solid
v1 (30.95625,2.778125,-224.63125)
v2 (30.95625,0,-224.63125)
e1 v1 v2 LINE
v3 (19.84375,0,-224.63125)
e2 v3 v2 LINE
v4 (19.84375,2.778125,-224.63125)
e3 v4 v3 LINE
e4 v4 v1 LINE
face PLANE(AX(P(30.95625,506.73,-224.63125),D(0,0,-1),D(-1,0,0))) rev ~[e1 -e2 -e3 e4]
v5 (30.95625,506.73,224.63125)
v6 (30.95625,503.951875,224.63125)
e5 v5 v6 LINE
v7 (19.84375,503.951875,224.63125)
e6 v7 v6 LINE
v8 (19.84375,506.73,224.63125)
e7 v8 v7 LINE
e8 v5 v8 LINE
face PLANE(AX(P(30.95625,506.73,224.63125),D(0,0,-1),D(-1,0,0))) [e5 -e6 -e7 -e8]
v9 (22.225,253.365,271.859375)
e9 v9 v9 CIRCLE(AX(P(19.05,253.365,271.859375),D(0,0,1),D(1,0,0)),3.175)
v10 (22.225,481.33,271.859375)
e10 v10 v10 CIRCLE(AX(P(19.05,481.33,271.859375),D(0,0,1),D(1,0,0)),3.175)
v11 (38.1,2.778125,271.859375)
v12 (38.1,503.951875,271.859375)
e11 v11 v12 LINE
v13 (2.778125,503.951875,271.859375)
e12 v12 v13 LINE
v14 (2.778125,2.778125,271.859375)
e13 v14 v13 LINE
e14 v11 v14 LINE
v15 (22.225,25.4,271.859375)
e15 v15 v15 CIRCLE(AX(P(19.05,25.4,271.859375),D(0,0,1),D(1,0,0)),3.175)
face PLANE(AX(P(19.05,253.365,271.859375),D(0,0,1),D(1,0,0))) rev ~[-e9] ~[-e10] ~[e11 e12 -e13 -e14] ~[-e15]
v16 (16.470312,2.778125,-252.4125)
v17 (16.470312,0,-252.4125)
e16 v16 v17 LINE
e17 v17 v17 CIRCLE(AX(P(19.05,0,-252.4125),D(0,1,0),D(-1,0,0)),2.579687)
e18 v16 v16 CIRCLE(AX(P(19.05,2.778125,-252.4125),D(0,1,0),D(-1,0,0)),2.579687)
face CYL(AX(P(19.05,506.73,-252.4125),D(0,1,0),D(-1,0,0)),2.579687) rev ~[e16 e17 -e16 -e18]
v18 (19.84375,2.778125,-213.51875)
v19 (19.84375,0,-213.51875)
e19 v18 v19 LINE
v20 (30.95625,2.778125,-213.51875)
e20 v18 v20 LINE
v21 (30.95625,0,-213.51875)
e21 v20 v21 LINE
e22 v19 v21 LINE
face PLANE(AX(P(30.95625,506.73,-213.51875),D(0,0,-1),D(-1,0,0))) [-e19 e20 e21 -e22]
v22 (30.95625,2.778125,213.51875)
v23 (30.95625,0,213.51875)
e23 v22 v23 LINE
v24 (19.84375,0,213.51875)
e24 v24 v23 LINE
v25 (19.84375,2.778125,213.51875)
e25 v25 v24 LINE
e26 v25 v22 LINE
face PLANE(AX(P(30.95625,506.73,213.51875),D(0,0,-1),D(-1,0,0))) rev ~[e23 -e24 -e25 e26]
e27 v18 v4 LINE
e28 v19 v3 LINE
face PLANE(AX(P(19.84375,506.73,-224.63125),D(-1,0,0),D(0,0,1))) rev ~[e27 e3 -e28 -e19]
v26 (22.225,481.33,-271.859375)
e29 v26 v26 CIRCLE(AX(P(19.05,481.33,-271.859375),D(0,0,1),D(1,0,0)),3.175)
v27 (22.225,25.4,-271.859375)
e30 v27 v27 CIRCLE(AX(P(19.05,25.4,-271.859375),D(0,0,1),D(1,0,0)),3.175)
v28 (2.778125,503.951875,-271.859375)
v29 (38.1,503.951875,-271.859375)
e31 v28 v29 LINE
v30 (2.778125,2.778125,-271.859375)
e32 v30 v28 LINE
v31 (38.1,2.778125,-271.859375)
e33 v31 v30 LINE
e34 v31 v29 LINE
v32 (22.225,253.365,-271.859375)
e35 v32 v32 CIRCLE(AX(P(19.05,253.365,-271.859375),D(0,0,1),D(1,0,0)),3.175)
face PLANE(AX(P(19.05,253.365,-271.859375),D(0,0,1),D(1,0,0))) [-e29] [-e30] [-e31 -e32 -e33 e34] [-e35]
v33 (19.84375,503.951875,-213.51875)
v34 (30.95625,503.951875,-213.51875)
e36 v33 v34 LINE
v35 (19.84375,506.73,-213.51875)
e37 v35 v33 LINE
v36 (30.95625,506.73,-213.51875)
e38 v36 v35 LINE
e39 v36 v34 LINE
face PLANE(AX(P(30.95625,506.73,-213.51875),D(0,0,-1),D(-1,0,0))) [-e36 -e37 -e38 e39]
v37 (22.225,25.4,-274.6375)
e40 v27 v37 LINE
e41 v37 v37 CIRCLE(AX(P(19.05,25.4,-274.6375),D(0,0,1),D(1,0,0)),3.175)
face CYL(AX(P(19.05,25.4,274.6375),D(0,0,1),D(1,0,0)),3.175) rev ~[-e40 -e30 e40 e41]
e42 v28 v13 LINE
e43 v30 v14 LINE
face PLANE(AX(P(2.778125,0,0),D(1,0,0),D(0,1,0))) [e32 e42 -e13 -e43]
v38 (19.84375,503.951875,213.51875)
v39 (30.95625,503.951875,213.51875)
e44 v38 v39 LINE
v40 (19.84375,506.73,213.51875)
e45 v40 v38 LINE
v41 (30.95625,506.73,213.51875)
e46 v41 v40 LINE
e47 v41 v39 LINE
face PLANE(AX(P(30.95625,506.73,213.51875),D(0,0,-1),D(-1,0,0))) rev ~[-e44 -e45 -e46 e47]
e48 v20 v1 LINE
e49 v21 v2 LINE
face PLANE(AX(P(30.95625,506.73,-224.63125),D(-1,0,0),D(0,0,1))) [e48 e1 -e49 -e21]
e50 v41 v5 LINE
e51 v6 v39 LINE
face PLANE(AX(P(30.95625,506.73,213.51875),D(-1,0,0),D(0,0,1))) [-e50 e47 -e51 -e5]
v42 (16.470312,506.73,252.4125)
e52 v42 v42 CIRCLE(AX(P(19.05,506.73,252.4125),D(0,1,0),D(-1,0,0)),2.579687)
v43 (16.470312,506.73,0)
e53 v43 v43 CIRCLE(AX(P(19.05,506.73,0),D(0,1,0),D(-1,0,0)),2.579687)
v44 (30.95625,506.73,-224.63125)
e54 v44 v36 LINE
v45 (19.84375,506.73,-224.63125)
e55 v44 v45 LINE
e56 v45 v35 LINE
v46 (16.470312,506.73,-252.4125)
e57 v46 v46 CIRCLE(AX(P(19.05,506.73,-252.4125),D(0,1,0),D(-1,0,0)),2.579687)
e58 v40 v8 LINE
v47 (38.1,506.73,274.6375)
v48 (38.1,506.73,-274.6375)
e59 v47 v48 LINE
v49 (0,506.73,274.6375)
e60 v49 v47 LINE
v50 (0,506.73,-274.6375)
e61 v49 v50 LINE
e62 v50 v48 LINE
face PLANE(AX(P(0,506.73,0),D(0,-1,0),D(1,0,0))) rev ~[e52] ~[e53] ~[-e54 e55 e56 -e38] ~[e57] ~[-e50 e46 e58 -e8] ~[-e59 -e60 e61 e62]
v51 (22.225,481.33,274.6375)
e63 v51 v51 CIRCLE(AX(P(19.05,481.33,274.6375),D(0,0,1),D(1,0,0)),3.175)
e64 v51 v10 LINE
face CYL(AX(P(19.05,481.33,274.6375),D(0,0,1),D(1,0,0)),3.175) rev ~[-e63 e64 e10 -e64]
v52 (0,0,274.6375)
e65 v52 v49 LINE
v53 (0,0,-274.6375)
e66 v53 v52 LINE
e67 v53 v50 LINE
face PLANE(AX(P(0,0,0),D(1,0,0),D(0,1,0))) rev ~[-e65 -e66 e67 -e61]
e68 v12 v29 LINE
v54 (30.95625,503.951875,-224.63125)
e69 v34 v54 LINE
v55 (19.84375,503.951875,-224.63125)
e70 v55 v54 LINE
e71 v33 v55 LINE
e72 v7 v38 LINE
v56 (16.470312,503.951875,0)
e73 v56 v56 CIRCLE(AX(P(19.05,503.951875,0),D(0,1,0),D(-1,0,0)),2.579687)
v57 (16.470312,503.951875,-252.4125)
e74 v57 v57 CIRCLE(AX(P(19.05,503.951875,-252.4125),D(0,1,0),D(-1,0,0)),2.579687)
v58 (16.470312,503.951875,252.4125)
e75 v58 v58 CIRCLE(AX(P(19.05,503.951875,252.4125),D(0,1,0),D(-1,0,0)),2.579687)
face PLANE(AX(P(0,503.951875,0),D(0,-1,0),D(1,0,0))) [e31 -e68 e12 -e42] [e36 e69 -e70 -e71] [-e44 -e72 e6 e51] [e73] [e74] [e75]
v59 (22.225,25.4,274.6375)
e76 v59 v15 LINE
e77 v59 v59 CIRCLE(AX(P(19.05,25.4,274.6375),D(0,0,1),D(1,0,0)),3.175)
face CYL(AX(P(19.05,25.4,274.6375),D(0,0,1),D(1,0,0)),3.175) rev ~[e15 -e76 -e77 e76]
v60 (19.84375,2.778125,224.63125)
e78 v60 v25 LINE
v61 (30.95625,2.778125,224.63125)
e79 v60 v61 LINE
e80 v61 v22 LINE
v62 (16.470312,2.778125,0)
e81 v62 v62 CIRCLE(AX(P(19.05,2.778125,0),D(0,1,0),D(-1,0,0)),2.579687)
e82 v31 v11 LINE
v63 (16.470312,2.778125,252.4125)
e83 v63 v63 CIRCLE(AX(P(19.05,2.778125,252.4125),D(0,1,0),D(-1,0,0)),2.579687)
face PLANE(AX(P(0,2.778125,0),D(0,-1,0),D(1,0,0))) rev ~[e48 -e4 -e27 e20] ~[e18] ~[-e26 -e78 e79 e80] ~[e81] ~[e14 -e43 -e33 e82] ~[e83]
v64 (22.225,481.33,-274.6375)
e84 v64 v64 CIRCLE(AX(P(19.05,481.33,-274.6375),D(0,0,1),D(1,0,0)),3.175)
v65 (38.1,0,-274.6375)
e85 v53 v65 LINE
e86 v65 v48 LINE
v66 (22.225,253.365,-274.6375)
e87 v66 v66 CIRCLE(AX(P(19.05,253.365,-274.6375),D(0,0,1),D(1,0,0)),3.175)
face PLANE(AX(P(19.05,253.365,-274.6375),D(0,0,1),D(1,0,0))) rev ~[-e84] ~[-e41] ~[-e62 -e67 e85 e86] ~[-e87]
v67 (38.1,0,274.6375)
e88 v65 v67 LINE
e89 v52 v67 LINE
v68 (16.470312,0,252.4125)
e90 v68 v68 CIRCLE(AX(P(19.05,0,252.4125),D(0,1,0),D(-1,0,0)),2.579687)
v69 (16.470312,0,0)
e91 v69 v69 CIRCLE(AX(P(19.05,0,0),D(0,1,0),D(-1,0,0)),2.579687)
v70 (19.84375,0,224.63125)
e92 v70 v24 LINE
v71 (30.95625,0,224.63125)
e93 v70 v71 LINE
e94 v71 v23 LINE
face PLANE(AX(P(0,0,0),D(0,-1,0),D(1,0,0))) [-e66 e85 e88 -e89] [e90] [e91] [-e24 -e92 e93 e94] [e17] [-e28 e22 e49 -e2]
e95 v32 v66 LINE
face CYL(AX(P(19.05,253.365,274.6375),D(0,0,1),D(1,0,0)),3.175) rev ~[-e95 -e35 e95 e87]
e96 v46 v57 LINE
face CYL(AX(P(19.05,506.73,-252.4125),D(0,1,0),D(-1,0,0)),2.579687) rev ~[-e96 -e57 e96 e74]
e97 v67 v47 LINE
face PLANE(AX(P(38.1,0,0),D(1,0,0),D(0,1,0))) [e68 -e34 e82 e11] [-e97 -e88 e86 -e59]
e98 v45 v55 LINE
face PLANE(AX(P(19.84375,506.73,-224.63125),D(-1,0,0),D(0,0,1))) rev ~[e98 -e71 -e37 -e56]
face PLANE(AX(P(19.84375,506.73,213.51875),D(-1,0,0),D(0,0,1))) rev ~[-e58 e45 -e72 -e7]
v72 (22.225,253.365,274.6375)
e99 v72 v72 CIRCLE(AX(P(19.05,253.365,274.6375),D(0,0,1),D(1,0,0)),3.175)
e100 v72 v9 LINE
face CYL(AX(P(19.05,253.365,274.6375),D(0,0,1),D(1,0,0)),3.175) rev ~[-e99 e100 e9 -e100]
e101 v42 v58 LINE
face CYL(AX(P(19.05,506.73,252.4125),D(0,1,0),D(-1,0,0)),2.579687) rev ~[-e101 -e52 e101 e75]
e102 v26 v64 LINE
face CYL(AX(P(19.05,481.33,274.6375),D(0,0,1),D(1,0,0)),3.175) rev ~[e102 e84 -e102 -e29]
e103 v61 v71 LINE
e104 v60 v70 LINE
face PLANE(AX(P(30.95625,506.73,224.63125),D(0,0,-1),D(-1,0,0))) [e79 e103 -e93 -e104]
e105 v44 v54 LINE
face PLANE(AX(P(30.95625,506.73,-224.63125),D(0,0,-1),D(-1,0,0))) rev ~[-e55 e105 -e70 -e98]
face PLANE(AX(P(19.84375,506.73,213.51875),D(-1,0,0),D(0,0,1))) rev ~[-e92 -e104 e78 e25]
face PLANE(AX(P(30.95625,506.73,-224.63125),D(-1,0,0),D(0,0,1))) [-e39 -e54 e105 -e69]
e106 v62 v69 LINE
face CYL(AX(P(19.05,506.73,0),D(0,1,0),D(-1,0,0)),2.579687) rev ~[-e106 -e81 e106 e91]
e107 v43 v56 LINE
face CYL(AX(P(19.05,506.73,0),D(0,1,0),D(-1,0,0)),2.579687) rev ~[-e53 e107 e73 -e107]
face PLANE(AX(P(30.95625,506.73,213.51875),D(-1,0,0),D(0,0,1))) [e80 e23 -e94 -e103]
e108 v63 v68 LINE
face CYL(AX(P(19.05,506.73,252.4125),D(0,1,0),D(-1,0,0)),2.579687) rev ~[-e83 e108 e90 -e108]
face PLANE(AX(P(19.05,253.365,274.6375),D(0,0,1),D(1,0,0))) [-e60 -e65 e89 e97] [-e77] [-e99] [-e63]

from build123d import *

# Parameters (mm, degrees)
F0_W     = 38.1
F0_H     = 506.73
F1_DEPTH = 274.6375
F2_T     = -2.778125
F3_R     = 2.5796875
F3_W     = 11.1125
F3_H     = 11.1125
F4_DEPTH = 506.731
F5_R     = 3.175
F6_DEPTH = 549.276


# Not quite as in the source:
# - a feature names something its author has since deleted; it is built from what else it names


with BuildPart() as f1:
    # F0 (on Top) → F1 (new body, symmetric)
    with BuildSketch(Plane.XY):
        with Locations((19.05, 253.365)):
            Rectangle(F0_W, F0_H)
    extrude(amount=F1_DEPTH, both=True)

    # F2
    f2_openings = [f1.faces().sort_by_distance(p)[0] for p in [
        (38.1, 253.365, 0),
    ]]
    offset(amount=F2_T, openings=f2_openings)

    # F3 (on face) → F4 (cut, through all)
    with BuildSketch(Plane(origin=(0, 506.73, 0), x_dir=(-1, 0, 0), z_dir=(0, 1, 0))):
        with Locations((-19.05, 252.4125)):
            Circle(F3_R)
        with Locations((-19.05, 0)):
            Circle(F3_R)
        with Locations((-19.05, -252.4125)):
            Circle(F3_R)
        with Locations((-25.4, 219.075)):
            Rectangle(F3_W, F3_H)
        with Locations((-25.4, -219.075)):
            Rectangle(F3_W, F3_H)
    extrude(amount=-F4_DEPTH, mode=Mode.SUBTRACT)

    # F5 (on face) → F6 (cut, through all)
    with BuildSketch(Plane.XY.offset(274.6375)):
        with Locations((19.05, 481.33)):
            Circle(F5_R)
        with Locations((19.05, 253.365)):
            Circle(F5_R)
        with Locations((19.05, 25.4)):
            Circle(F5_R)
    extrude(amount=-F6_DEPTH, mode=Mode.SUBTRACT)


solid = f1.part
